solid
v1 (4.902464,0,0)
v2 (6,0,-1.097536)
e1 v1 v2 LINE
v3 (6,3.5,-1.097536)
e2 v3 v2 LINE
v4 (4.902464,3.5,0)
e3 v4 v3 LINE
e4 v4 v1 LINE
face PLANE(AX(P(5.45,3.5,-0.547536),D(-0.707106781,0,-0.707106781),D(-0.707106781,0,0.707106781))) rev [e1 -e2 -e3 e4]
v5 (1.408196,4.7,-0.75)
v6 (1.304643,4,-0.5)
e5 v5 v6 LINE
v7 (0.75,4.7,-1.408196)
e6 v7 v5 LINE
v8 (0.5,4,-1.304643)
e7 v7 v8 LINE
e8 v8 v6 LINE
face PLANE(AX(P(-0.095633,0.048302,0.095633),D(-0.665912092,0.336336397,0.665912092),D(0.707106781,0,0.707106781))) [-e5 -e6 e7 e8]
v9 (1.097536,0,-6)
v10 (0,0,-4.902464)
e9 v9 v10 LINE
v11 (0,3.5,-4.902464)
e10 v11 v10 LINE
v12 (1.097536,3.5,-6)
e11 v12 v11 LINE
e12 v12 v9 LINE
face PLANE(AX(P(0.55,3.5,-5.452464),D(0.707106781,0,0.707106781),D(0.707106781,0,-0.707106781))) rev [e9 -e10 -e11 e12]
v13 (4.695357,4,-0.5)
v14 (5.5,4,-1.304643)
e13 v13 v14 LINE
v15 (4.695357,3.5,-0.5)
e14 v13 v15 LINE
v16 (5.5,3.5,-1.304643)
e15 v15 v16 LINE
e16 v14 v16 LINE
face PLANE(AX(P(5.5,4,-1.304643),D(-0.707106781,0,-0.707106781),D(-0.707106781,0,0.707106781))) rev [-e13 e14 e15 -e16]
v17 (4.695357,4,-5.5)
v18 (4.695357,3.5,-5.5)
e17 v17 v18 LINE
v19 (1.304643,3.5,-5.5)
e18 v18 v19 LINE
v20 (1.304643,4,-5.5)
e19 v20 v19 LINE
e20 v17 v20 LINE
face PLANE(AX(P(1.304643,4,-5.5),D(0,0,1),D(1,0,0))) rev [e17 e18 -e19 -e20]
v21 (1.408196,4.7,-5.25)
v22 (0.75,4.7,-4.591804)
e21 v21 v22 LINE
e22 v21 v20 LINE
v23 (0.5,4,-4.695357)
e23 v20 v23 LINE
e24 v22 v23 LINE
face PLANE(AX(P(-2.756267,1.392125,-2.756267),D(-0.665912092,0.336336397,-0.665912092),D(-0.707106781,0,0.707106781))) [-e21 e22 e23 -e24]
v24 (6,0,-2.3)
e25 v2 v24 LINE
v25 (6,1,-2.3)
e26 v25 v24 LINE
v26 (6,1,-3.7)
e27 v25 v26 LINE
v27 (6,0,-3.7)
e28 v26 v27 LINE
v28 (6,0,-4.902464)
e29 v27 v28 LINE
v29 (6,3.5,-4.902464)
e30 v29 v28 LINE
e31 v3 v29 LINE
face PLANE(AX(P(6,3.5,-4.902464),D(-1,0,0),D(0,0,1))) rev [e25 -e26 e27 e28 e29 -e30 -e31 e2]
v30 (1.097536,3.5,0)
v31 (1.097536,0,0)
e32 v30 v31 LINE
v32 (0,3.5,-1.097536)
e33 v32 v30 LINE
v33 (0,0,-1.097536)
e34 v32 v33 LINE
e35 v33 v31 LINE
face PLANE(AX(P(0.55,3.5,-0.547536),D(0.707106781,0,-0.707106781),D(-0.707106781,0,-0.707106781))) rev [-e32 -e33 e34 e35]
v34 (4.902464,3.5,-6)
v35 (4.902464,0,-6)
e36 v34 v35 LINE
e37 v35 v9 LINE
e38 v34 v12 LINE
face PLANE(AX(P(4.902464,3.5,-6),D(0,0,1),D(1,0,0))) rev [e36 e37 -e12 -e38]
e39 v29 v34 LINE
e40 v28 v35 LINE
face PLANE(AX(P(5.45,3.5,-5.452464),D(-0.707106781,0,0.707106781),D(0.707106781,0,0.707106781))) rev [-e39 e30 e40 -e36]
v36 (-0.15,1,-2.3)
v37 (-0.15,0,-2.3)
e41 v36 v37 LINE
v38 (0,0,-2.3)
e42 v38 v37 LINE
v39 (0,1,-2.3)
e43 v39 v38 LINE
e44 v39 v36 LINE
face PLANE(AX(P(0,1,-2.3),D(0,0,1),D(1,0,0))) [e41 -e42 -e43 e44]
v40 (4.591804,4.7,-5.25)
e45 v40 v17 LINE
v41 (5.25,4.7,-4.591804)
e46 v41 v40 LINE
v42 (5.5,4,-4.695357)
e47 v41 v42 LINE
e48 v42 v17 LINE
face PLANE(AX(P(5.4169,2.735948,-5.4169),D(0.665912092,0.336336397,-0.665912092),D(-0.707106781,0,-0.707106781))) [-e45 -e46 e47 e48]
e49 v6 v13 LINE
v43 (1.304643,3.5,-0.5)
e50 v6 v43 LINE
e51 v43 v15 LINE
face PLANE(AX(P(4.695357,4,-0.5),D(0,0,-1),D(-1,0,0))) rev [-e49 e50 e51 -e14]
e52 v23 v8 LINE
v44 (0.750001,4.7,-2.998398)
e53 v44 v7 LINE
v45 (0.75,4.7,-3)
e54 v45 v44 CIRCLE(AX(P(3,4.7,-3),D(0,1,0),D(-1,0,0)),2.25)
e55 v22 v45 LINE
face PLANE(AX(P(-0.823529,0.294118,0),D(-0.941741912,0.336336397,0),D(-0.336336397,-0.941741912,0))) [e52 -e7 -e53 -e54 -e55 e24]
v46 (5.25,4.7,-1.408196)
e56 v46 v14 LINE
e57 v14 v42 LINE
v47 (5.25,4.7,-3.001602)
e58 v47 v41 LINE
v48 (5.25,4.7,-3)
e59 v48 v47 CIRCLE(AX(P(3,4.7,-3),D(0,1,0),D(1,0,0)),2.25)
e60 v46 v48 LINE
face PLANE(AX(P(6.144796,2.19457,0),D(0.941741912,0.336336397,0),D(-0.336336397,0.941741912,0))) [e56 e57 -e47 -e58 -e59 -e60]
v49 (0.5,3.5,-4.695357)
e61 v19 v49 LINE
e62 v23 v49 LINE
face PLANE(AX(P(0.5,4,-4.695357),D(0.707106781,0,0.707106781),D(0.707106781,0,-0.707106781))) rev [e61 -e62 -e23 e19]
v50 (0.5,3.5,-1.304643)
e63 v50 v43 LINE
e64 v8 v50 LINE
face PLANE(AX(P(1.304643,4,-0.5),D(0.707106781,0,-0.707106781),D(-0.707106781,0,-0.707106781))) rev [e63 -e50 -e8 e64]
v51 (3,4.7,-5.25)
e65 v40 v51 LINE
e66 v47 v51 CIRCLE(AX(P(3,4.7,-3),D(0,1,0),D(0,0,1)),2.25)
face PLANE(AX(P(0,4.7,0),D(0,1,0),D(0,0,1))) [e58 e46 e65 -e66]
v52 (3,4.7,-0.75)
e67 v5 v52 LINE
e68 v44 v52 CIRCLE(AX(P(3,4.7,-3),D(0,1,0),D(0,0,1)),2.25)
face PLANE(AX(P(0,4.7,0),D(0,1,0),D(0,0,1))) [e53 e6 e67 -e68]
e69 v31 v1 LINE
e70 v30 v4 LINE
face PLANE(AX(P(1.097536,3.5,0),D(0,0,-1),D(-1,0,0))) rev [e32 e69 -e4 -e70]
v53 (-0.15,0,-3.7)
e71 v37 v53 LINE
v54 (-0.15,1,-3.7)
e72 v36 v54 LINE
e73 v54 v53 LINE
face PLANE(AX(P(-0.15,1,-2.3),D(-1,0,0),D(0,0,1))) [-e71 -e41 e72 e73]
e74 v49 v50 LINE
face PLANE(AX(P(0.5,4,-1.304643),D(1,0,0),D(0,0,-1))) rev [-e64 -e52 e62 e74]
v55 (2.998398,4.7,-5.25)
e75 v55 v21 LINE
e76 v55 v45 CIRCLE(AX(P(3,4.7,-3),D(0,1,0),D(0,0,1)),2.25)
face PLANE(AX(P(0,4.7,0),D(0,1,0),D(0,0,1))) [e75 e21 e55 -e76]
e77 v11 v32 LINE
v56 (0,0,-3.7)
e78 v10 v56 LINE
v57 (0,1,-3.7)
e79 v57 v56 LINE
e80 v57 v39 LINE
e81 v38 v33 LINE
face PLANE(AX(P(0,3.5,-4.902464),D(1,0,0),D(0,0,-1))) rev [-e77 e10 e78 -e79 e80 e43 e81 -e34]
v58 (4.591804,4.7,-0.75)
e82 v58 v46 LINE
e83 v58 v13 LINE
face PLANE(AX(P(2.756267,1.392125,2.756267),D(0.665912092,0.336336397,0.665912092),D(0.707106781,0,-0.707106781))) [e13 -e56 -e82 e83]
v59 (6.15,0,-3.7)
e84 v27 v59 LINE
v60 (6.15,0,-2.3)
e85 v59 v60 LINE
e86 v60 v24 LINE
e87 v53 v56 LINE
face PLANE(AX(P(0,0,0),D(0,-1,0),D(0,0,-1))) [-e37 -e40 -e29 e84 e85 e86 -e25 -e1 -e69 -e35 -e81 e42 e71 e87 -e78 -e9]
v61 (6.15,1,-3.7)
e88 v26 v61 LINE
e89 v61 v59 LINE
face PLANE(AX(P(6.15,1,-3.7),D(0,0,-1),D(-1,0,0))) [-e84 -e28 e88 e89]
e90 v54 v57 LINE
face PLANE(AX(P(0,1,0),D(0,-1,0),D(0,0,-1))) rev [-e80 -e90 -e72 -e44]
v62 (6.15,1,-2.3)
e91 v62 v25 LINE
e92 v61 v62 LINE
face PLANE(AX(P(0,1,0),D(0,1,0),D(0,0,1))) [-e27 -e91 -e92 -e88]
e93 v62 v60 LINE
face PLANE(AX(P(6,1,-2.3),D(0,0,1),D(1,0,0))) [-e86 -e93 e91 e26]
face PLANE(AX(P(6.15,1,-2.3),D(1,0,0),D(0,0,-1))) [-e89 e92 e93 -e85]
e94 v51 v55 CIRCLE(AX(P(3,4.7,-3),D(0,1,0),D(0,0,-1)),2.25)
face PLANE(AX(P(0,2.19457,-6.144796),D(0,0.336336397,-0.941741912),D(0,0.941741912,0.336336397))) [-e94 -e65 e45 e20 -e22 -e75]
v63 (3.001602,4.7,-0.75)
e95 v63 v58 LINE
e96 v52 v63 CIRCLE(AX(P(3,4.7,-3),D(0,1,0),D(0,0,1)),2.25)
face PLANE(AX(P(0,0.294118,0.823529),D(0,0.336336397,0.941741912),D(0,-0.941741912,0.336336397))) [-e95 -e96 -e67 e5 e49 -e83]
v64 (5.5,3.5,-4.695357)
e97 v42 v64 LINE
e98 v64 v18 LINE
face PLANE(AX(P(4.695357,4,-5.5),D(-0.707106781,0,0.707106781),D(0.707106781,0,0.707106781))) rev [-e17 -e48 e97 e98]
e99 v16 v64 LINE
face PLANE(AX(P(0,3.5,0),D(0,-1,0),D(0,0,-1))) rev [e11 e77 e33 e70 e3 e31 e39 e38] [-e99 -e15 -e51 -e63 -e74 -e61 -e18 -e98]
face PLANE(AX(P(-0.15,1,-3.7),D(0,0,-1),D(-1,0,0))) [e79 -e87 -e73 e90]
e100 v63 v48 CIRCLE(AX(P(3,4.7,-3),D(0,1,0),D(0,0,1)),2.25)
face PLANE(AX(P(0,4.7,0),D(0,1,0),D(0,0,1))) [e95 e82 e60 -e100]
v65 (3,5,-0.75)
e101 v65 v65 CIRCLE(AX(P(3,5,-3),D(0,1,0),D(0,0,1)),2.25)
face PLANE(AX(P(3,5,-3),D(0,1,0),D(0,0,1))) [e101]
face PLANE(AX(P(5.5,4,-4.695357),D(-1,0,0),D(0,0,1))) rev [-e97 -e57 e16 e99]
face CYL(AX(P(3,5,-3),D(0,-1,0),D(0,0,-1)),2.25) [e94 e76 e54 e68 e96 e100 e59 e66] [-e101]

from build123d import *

# Parameters (mm, degrees)
EXTRUDE_1_DEPTH = 3.5
EXTRUDE_2_DEPTH = 0.5
EXTRUDE_3_DEPTH = 0.7
SKETCH_4_R      = 2.25
EXTRUDE_4_DEPTH = 0.3
EXTRUDE_5_DEPTH = 1


with BuildPart() as part:
    # 草图1 → 凸台-拉伸1 (new body)
    with BuildSketch(Plane(origin=(0, 0, 0), x_dir=(1, 0, 0), z_dir=(0, 1, 0))):
        Polygon((0, 4.902463921), (0, 1.097536079), (0.55, 0.547536079), (1.097536079, 0), (4.902463921, 0), (5.45, 0.547536079), (6, 1.097536079), (6, 4.902463921), (5.45, 5.452463921), (4.902463921, 6), (1.097536079, 6), (0.55, 5.452463921), align=None)
    extrude(amount=EXTRUDE_1_DEPTH)

    # 草图2 → 凸台-拉伸2 (add)
    with BuildSketch(Plane(origin=(0, 3.5, 0), x_dir=(1, 0, 0), z_dir=(0, 1, 0))):
        Polygon((1.30464286, 5.5), (4.69535714, 5.5), (5.5, 4.69535714), (5.5, 1.30464286), (4.69535714, 0.5), (1.30464286, 0.5), (0.5, 1.30464286), (0.5, 4.69535714), align=None)
    extrude(amount=EXTRUDE_2_DEPTH)

    # 草图3 → 凸台-拉伸3 (add)
    with BuildSketch(Plane(origin=(0, 4, 0), x_dir=(1, 0, 0), z_dir=(0, 1, 0))):
        Polygon((4.591803749, 5.25), (1.408196251, 5.25), (0.75, 4.591803749), (0.75, 1.408196251), (1.408196251, 0.75), (4.591803749, 0.75), (5.25, 1.408196251), (5.25, 4.591803749), align=None)
    extrude(amount=EXTRUDE_3_DEPTH)

    # 草图4 → 凸台-拉伸4 (add)
    with BuildSketch(Plane(origin=(0, 4.7, 0), x_dir=(1, 0, 0), z_dir=(0, 1, 0))):
        with Locations(Location((3, 3, 0), (0, 0, 270))):
            Circle(SKETCH_4_R)
    extrude(amount=EXTRUDE_4_DEPTH)

    # 放样2: read off the stored shape, not the designer's step
    # 放样2: loft between two sections, ruled curve by curve
    loft_2_from = [
        Edge.make_line((1.408196251, 4.7, -5.25), (0.75, 4.7, -4.591803749)),
        Edge.make_line((5.25, 4.7, -4.591803749), (4.591803749, 4.7, -5.25)),
        Edge.make_line((4.591803749, 4.7, -0.75), (5.25, 4.7, -1.408196251)),
        Edge.make_line((0.75, 4.7, -1.408196251), (1.408196251, 4.7, -0.75)),
        Edge.make_line((4.591803749, 4.7, -5.25), (1.408196251, 4.7, -5.25)),
        Edge.make_line((5.25, 4.7, -1.408196251), (5.25, 4.7, -4.591803749)),
        Edge.make_line((0.75, 4.7, -1.408196251), (0.75, 4.7, -4.591803749)),
        Edge.make_line((1.408196251, 4.7, -0.75), (4.591803749, 4.7, -0.75)),
    ]
    loft_2_to = [
        Edge.make_line((1.30464286, 4, -5.5), (0.5, 4, -4.69535714)),
        Edge.make_line((5.5, 4, -4.69535714), (4.69535714, 4, -5.5)),
        Edge.make_line((4.69535714, 4, -0.5), (5.5, 4, -1.30464286)),
        Edge.make_line((0.5, 4, -1.30464286), (1.30464286, 4, -0.5)),
        Edge.make_line((4.69535714, 4, -5.5), (1.30464286, 4, -5.5)),
        Edge.make_line((5.5, 4, -1.30464286), (5.5, 4, -4.69535714)),
        Edge.make_line((0.5, 4, -1.30464286), (0.5, 4, -4.69535714)),
        Edge.make_line((1.30464286, 4, -0.5), (4.69535714, 4, -0.5)),
    ]
    loft_2 = Solid(Shell([*[Face.make_surface_from_curves(loft_2_from[k], loft_2_to[k]) for k in range(8)], Face(Wire(loft_2_from)), Face(Wire(loft_2_to))]))
    add(loft_2)

    # 草图5 → 凸台-拉伸5 (add)
    with BuildSketch(Plane.XZ):
        Polygon((0, -3), (0, -2.3), (-0.15, -2.3), (-0.15, -3.7), (0, -3.7), align=None)
        Polygon((6, -3), (6, -2.3), (6.15, -2.3), (6.15, -3.7), (6, -3.7), align=None)
    extrude(amount=-EXTRUDE_5_DEPTH)


solid = part.part
